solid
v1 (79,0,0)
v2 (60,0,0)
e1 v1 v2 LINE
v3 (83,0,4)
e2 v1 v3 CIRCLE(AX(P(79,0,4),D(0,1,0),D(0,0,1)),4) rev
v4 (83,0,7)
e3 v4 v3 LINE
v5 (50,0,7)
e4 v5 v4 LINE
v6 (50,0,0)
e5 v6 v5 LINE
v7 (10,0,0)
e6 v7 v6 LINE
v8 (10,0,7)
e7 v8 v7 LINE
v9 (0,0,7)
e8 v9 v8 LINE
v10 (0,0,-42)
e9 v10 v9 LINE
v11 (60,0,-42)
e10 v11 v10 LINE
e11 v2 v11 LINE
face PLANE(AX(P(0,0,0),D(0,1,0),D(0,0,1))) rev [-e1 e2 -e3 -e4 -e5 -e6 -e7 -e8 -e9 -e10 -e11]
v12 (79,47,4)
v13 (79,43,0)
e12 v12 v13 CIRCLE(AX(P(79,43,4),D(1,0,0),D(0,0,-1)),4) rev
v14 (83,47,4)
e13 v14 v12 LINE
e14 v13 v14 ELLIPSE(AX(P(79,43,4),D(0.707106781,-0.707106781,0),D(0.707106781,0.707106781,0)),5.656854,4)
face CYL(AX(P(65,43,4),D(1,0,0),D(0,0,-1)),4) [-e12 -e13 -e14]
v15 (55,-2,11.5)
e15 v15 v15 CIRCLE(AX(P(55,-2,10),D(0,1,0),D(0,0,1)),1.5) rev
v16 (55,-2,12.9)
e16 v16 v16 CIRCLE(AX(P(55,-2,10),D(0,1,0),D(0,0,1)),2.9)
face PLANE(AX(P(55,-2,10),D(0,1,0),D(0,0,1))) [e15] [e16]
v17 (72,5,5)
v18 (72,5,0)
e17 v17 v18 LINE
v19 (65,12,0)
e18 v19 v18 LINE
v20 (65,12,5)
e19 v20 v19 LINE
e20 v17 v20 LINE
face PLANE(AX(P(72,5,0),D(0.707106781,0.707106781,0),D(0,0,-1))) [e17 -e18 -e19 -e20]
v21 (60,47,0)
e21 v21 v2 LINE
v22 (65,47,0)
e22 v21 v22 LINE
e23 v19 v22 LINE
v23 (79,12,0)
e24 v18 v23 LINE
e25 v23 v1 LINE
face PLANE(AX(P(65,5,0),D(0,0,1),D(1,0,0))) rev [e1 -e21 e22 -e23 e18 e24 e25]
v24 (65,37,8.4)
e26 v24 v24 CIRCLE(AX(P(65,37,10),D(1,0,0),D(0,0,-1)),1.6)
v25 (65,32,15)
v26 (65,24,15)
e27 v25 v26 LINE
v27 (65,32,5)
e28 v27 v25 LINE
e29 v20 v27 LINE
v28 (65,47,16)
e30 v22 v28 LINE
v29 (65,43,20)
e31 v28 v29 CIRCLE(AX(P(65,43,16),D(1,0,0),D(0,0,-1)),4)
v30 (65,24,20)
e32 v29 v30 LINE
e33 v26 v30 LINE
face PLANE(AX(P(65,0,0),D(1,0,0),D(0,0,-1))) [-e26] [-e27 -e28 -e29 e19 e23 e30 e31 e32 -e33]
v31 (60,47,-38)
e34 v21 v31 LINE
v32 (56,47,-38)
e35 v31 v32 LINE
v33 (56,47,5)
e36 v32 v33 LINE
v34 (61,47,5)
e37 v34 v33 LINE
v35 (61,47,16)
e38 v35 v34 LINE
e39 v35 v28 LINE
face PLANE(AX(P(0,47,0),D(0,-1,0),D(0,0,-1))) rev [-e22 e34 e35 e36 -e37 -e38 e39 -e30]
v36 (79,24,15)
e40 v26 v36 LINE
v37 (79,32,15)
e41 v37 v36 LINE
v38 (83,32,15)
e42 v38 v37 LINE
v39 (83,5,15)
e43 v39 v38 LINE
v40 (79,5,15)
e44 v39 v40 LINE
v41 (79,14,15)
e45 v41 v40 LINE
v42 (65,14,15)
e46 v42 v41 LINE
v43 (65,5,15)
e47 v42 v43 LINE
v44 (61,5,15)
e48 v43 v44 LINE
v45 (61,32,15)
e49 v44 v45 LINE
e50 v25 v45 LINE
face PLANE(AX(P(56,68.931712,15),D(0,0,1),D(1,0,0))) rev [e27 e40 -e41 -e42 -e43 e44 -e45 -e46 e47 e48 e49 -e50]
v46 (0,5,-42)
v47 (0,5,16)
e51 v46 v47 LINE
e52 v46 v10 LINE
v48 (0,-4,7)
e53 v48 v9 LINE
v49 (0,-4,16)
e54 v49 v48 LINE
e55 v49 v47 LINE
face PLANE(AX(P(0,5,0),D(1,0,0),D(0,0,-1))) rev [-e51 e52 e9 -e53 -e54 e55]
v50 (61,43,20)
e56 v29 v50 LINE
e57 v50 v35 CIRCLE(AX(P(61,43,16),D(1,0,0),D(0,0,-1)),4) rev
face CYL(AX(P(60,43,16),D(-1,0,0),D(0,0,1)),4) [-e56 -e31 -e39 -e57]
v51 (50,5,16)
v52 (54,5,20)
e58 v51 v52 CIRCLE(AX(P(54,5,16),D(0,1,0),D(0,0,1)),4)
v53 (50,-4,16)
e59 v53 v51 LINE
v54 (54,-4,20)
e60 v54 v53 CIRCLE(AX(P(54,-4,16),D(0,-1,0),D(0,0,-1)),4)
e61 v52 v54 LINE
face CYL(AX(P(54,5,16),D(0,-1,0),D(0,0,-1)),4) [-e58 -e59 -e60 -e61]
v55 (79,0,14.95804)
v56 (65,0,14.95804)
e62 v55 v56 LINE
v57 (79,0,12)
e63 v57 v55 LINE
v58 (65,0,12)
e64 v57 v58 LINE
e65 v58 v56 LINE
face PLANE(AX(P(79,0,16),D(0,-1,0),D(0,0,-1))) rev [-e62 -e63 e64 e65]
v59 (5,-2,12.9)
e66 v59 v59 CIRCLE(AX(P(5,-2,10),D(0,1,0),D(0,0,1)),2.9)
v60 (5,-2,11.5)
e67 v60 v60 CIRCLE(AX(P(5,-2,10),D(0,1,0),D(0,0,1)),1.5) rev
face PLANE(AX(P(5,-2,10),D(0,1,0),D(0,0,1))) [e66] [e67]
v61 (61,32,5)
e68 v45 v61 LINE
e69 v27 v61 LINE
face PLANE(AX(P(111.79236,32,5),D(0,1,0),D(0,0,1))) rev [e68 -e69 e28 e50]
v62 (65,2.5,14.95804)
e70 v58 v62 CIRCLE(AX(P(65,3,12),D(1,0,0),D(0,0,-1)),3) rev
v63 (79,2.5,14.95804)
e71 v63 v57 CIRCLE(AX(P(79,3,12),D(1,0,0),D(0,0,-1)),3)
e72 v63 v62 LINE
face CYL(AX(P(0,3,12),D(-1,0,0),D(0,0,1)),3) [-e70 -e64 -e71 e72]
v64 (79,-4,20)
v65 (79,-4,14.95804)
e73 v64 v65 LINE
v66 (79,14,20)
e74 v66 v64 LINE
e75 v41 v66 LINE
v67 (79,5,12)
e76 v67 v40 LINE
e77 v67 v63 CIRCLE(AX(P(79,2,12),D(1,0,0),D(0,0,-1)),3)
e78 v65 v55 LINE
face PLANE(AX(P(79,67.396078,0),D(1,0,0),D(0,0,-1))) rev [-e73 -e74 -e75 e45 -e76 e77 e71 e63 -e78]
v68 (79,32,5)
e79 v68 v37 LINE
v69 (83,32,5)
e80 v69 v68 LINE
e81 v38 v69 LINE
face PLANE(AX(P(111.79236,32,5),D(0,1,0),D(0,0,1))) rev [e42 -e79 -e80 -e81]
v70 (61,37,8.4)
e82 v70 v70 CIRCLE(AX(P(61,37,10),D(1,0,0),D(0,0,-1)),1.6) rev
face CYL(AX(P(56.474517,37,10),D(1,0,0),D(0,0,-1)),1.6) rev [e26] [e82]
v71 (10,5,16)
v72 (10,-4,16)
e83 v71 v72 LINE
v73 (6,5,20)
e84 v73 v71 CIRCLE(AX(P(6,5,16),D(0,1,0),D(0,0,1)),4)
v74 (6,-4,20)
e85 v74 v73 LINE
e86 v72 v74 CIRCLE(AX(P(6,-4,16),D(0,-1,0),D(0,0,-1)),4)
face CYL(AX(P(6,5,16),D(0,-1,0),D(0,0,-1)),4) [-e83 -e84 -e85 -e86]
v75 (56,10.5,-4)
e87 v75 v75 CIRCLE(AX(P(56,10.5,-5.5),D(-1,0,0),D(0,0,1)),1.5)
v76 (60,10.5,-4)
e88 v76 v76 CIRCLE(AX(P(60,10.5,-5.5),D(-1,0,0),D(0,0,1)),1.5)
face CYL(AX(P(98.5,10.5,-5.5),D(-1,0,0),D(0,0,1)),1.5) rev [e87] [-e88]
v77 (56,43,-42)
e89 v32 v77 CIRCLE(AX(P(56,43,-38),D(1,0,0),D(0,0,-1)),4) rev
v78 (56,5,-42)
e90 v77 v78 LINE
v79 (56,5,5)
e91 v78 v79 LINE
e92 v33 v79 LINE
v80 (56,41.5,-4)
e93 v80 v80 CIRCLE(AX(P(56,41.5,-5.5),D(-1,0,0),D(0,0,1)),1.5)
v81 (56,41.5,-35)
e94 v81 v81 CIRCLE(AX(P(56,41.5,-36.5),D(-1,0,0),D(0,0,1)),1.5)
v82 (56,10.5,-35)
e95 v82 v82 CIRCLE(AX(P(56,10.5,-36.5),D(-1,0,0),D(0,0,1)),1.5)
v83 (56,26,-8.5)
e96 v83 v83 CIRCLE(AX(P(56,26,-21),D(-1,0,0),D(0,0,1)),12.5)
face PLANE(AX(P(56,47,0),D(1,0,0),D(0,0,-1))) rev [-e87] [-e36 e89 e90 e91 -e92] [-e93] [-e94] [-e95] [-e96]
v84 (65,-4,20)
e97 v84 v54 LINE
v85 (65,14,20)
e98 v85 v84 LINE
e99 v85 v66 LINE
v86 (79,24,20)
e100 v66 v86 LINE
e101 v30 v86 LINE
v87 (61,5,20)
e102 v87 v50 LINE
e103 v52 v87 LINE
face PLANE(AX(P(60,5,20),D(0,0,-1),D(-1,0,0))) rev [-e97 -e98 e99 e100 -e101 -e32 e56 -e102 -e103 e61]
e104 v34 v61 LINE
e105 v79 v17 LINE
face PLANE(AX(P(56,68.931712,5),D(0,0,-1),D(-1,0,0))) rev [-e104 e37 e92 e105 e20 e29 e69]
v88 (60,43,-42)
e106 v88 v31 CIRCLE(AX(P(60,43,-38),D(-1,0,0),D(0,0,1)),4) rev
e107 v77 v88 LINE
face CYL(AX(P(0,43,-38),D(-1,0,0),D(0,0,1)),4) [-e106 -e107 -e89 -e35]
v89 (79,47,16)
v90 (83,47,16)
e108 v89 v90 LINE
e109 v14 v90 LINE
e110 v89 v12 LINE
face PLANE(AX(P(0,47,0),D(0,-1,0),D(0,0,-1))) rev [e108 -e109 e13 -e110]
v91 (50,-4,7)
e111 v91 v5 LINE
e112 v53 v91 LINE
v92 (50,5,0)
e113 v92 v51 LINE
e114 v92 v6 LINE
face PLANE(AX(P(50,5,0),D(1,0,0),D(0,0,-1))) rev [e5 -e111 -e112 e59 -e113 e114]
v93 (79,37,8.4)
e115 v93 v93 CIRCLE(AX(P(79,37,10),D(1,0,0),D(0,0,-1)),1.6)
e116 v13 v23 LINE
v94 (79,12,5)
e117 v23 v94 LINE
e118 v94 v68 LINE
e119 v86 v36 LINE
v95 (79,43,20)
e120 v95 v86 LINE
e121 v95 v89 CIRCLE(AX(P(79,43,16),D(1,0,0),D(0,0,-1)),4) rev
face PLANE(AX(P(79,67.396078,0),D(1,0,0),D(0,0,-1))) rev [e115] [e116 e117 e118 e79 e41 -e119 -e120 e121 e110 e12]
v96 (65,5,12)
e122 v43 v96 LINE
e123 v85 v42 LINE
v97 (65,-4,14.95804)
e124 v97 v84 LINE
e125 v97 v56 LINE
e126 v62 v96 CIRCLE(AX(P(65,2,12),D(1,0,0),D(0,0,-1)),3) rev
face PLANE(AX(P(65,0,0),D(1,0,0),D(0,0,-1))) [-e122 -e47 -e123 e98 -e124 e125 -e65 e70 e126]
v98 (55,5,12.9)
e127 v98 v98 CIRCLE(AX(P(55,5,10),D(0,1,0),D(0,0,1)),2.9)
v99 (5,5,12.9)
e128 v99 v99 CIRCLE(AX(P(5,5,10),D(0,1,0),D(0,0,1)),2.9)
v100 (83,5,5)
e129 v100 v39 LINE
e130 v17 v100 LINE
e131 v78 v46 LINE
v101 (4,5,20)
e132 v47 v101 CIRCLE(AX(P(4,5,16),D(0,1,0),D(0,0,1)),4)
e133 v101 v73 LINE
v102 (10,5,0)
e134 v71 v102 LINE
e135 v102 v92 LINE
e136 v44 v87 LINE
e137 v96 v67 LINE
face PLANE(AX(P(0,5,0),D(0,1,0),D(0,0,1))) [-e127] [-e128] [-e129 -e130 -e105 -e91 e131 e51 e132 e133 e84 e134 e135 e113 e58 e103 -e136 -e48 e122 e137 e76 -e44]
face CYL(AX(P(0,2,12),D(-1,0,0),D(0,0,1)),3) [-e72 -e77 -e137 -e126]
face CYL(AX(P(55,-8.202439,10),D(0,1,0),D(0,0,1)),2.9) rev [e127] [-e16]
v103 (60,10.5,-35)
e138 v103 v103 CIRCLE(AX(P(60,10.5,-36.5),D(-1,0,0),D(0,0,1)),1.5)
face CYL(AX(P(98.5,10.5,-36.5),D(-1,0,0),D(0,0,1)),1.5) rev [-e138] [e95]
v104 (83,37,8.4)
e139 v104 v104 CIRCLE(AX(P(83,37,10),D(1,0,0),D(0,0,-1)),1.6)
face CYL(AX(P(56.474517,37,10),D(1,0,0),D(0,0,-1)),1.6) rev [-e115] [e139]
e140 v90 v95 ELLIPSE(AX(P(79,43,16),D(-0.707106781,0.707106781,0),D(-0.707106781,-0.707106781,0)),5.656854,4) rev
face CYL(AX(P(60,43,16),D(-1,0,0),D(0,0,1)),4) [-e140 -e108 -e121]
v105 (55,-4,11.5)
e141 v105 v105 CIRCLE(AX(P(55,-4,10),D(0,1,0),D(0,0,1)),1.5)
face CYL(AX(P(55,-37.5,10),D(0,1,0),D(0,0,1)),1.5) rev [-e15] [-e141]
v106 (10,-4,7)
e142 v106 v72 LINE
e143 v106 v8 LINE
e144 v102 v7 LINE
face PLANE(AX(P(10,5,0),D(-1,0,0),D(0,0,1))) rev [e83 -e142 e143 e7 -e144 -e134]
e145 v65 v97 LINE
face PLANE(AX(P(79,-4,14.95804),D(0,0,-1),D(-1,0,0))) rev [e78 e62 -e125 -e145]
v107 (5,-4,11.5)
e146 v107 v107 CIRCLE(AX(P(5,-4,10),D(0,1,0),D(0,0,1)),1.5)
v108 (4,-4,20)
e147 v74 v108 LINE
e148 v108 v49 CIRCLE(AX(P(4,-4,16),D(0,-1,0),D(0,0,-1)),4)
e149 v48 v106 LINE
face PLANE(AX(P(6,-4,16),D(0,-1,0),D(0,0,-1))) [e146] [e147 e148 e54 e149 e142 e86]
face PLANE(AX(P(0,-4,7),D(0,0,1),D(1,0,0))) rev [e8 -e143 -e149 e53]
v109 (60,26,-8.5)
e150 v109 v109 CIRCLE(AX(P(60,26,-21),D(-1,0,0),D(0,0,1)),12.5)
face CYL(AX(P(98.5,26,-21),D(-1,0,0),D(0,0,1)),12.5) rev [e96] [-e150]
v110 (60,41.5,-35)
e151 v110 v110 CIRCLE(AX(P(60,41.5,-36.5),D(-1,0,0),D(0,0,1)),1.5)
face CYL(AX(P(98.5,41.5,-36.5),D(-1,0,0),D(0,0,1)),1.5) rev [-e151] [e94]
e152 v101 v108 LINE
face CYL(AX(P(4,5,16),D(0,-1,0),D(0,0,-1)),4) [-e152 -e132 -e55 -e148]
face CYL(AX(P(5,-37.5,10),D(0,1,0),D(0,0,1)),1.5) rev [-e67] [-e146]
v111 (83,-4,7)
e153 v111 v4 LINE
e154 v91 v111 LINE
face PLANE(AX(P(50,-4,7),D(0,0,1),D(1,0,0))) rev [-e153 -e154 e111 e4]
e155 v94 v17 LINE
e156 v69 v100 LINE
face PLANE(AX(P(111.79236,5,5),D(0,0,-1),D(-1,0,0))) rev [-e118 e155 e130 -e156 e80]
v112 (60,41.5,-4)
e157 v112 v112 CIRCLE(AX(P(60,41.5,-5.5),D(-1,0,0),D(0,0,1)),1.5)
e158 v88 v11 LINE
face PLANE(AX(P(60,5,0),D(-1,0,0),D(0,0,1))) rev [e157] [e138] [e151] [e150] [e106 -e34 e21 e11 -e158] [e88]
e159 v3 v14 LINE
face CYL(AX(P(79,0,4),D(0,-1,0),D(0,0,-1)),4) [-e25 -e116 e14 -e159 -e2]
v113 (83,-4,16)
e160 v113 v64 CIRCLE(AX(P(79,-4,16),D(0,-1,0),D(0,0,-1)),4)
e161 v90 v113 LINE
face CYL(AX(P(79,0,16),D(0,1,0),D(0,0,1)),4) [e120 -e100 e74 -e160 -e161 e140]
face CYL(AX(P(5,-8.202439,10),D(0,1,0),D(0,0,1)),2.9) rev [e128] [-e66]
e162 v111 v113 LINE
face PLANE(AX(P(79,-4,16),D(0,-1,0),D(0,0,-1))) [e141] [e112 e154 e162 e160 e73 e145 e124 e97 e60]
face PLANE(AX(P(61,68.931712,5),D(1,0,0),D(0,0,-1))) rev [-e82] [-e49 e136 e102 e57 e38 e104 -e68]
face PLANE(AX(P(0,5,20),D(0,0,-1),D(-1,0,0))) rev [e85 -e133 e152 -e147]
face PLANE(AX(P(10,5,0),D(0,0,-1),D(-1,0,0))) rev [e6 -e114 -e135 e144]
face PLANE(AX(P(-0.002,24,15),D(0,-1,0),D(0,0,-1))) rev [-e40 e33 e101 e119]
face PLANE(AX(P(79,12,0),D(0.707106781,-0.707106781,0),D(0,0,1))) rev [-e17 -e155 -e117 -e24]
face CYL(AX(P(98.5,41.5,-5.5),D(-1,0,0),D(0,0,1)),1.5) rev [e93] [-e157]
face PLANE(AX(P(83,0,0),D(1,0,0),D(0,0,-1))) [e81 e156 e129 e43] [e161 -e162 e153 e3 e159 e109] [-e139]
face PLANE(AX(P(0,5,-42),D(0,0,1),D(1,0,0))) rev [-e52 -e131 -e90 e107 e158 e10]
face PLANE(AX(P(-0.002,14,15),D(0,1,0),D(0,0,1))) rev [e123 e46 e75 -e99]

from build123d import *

# Parameters (mm, degrees)
EXTRUDE_1_DEPTH      = 5
SKETCH_3_W           = 4
SKETCH_3_H           = 42
EXTRUDE_2_DEPTH      = 42
SKETCH_4_R           = 1.5
CUT_EXTRUDE_1_DEPTH  = 42.5
SKETCH_5_R           = 12.5
CUT_EXTRUDE_2_DEPTH  = 42.5
SKETCH_6_R           = 1.5
CUT_EXTRUDE_3_DEPTH  = 42.5
SKETCH_7_W           = 20
SKETCH_7_H           = 5
EXTRUDE_3_DEPTH      = 5
EXTRUDE_5_DEPTH      = 42
SKETCH_11_W          = 20
SKETCH_11_H          = 5
EXTRUDE_6_DEPTH      = 18
SKETCH_12_W          = 4
SKETCH_12_H          = 20
EXTRUDE_7_DEPTH      = 42
CUT_EXTRUDE_4_REACH  = 106.221
SKETCH_13_R          = 1.6
CUT_EXTRUDE_START    = -22
SKETCH_15_W          = 10
SKETCH_15_H          = 27
CUT_EXTRUDE_5_DEPTH  = 22
SKETCH_16_W          = 5
SKETCH_16_H          = 5
CUT_EXTRUDE_6_DEPTH  = 42
EXTRUDE_START        = -22
SKETCH_17_W          = 10
SKETCH_17_H          = 5
EXTRUDE_8_DEPTH      = 22
CUT_EXTRUDE_7_DEPTH  = 5
FILLET_1_R           = 4
SKETCH_20_W          = 14
SKETCH_20_H          = 5
CUT_EXTRUDE_8_DEPTH  = 5
FILLET_3_R           = 3
SKETCH_21_R          = 2.9
CUT_EXTRUDE_9_DEPTH  = 3
EXTRUDE_9_DEPTH      = 4
SKETCH_24_R          = 1.5
CUT_EXTRUDE_10_DEPTH = 4
SKETCH_26_R          = 2.9
CUT_EXTRUDE_15_DEPTH = 4
CHAMFER_1_SIZE       = 7
EXTRUDE_10_REACH     = 103.064
SKETCH_28_W          = 5
SKETCH_28_H          = 10


# Some blends are built 0.0001 mm under size
with BuildPart() as part:
    # 草图1 → 凸台-拉伸1 (new body)
    with BuildSketch(Plane(origin=(0, 0, 0), x_dir=(1, 0, 0), z_dir=(0, 1, 0))):
        Polygon((10, 0), (50, 0), (50, -20), (60, -20), (60, 0), (60, 42), (0, 42), (0, 0), (0, -20), (10, -20), align=None)
    extrude(amount=EXTRUDE_1_DEPTH)

    # 草图3 → 凸台-拉伸2 (add)
    with BuildSketch(Plane(origin=(0, 5, 0), x_dir=(1, 0, 0), z_dir=(0, 1, 0))):
        with Locations((58, 21)):
            Rectangle(SKETCH_3_W, SKETCH_3_H)
    extrude(amount=EXTRUDE_2_DEPTH)

    # 草图4 → 切除-拉伸1 (cut)
    with BuildSketch(Plane.ZY.offset(-56)):
        with Locations((-36.5, 41.5)):
            Circle(SKETCH_4_R)
        with Locations((-5.5, 41.5)):
            Circle(SKETCH_4_R)
        with Locations((-5.5, 10.5)):
            Circle(SKETCH_4_R)
        with Locations((-36.5, 10.5)):
            Circle(SKETCH_4_R)
    extrude(amount=-CUT_EXTRUDE_1_DEPTH, mode=Mode.SUBTRACT)

    # 草图5 → 切除-拉伸2 (cut)
    with BuildSketch(Plane.ZY.offset(-56)):
        with Locations((-21, 26)):
            Circle(SKETCH_5_R)
    extrude(amount=-CUT_EXTRUDE_2_DEPTH, mode=Mode.SUBTRACT)

    # 草图6 → 切除-拉伸3 (cut)
    with BuildSketch(Plane(origin=(0, 5, 0), x_dir=(1, 0, 0), z_dir=(0, 1, 0))):
        with Locations(Location((55, -10, 0), (0, 0, 270))):
            Circle(SKETCH_6_R)
        with Locations(Location((5, -10, 0), (0, 0, 270))):
            Circle(SKETCH_6_R)
    extrude(amount=-CUT_EXTRUDE_3_DEPTH, mode=Mode.SUBTRACT)

    # 草图7 → 凸台-拉伸3 (add)
    with BuildSketch(Plane(origin=(60, 0, 0), x_dir=(0, 0, -1), z_dir=(1, 0, 0))):
        with Locations((-10, 2.5)):
            Rectangle(SKETCH_7_W, SKETCH_7_H)
    extrude(amount=EXTRUDE_3_DEPTH)

    # 草图8 → 凸台-拉伸5 (add)
    with BuildSketch(Plane(origin=(0, 5, 0), x_dir=(1, 0, 0), z_dir=(0, 1, 0))):
        Polygon((65, 0), (56, 0), (56, -5), (61, -5), (61, -15), (56, -15), (56, -20), (65, -20), align=None)
    extrude(amount=EXTRUDE_5_DEPTH)

    # 草图11 → 凸台-拉伸6 (add)
    with BuildSketch(Plane(origin=(65, 0, 0), x_dir=(0, 0, -1), z_dir=(1, 0, 0))):
        with Locations((-10, 2.5)):
            Rectangle(SKETCH_11_W, SKETCH_11_H)
    extrude(amount=EXTRUDE_6_DEPTH)

    # 草图12 → 凸台-拉伸7 (add)
    with BuildSketch(Plane(origin=(0, 5, 0), x_dir=(1, 0, 0), z_dir=(0, 1, 0))):
        with Locations((81, -10)):
            Rectangle(SKETCH_12_W, SKETCH_12_H)
    extrude(amount=EXTRUDE_7_DEPTH)

    # 切除-拉伸4: up to this face of the body (flat: up to its plane)
    cut_extrude_4_end = Plane(part.part.faces().sort_by_distance((61, 26, 10))[0])
    # 草图13 → 切除-拉伸4 (cut, up to the picked face)
    with BuildSketch(Plane(origin=(83, 0, 0), x_dir=(0, 0, -1), z_dir=(1, 0, 0)), mode=Mode.PRIVATE) as cut_extrude_4_sk1:
        with Locations((-10, 37)):
            Circle(SKETCH_13_R)
    cut_extrude_4_tool1 = split(extrude(cut_extrude_4_sk1.sketch, amount=-CUT_EXTRUDE_4_REACH, mode=Mode.PRIVATE), bisect_by=cut_extrude_4_end, keep=Keep.BOTH, mode=Mode.PRIVATE)
    add(cut_extrude_4_tool1.solids().sort_by(Axis((83, 37, 10), (-1, 0, 0)))[0], mode=Mode.SUBTRACT)

    # 草图15 → 切除-拉伸5 (cut)
    with BuildSketch(Plane.ZY.offset(-61).offset(CUT_EXTRUDE_START)):
        with Locations((10, 18.5)):
            Rectangle(SKETCH_15_W, SKETCH_15_H)
    extrude(amount=CUT_EXTRUDE_5_DEPTH, mode=Mode.SUBTRACT)

    # 草图16 → 切除-拉伸6 (cut)
    with BuildSketch(Plane(origin=(0, 47, 0), x_dir=(1, 0, 0), z_dir=(0, 1, 0))):
        with Locations((58.5, -17.5)):
            Rectangle(SKETCH_16_W, SKETCH_16_H)
    extrude(amount=-CUT_EXTRUDE_6_DEPTH, mode=Mode.SUBTRACT)

    # 草图17 → 凸台-拉伸8 (add)
    with BuildSketch(Plane.ZY.offset(-61).offset(EXTRUDE_START)):
        with Locations((10, 7.5)):
            Rectangle(SKETCH_17_W, SKETCH_17_H)
    extrude(amount=EXTRUDE_8_DEPTH)

    # 草图19 → 切除-拉伸7 (cut)
    with BuildSketch(Plane(origin=(0, 10, 0), x_dir=(1, 0, 0), z_dir=(0, 1, 0))):
        Polygon((79, -15), (83, -15), (83, -5), (79, -5), (65, -5), (61, -5), (61, -15), (65, -15), align=None)
    extrude(amount=-CUT_EXTRUDE_7_DEPTH, mode=Mode.SUBTRACT)

    # 圆角1
    fillet_1_edges = [part.edges().sort_by_distance(p)[0] for p in [
        (83, 23.5, 0),
        (83, 23.5, 20),
        (81, 47, 20),
        (81, 47, 0),
        (50, 2.5, 20),
        (10, 2.5, 20),
        (0, 2.5, 20),
        (58, 47, -42),
        (63, 47, 20),
    ]]
    fillet(fillet_1_edges, radius=FILLET_1_R - 0.0001)  # a hair under: the kernel refuses the full size

    # 草图20 → 切除-拉伸8 (cut)
    with BuildSketch(Plane.XY.offset(20)):
        with Locations((72, 2.5)):
            Rectangle(SKETCH_20_W, SKETCH_20_H)
    extrude(amount=-CUT_EXTRUDE_8_DEPTH, mode=Mode.SUBTRACT)

    # 圆角3
    # the kernel refuses this fillet: 3 mm, written as the material it takes off along each edge
    with BuildSketch(Plane(origin=(79, 0, 15), x_dir=(0, 0, -1), z_dir=(-1, 0, 0)), Plane(origin=(65, 5, 15), x_dir=(0, 0, -1), z_dir=(1, 0, 0))) as fillet_3_piece_1:
        with BuildLine():
            CenterArc((FILLET_3_R, -FILLET_3_R), FILLET_3_R, 90, 90)
            Line((0, -FILLET_3_R), (0, 0))
            Line((0, 0), (FILLET_3_R, 0))
        make_face()
    extrude(amount=14, mode=Mode.SUBTRACT)

    # 草图21 → 切除-拉伸9 (cut)
    with BuildSketch(Plane(origin=(0, 5, 0), x_dir=(1, 0, 0), z_dir=(0, 1, 0))):
        with Locations(Location((5, -10, 0), (0, 0, 270))):
            Circle(SKETCH_21_R)
        with Locations(Location((55, -10, 0), (0, 0, 270))):
            Circle(SKETCH_21_R)
    extrude(amount=-CUT_EXTRUDE_9_DEPTH, mode=Mode.SUBTRACT)

    # 草图23 → 凸台-拉伸9 (add)
    with BuildSketch(Plane.XZ):
        with BuildLine():
            Line((54, 20), (65, 20))
            Line((65, 20), (65, 14.958039892))
            Line((65, 14.958039892), (79, 14.958039892))
            Line((79, 14.958039892), (79, 20))
            ThreePointArc((79, 20), (81.828427125, 18.828427125), (83, 16))
            Line((83, 16), (83, 7))
            Line((83, 7), (50, 7))
            Line((50, 7), (50, 16))
            ThreePointArc((50, 16), (51.171572875, 18.828427125), (54, 20))
        make_face()
        with BuildLine():
            Line((4, 20), (6, 20))
            ThreePointArc((6, 20), (8.828427125, 18.828427125), (10, 16))
            Line((10, 16), (10, 7))
            Line((10, 7), (0, 7))
            Line((0, 7), (0, 16))
            ThreePointArc((0, 16), (1.171572875, 18.828427125), (4, 20))
        make_face()
    extrude(amount=EXTRUDE_9_DEPTH)

    # 草图24 → 切除-拉伸10 (cut)
    with BuildSketch(Plane(origin=(0, 0, 0), x_dir=(1, 0, 0), z_dir=(0, 1, 0))):
        with Locations(Location((55, -10, 0), (0, 0, 270))):
            Circle(SKETCH_24_R)
        with Locations(Location((5, -10, 0), (0, 0, 270))):
            Circle(SKETCH_24_R)
    extrude(amount=-CUT_EXTRUDE_10_DEPTH, mode=Mode.SUBTRACT)

    # 草图26 → 切除-拉伸15 (cut)
    with BuildSketch(Plane(origin=(0, 2, 0), x_dir=(1, 0, 0), z_dir=(0, 1, 0))):
        with Locations(Location((55, -10, 0), (0, 0, 270))):
            Circle(SKETCH_26_R)
        with Locations(Location((5, -10, 0), (0, 0, 270))):
            Circle(SKETCH_26_R)
    extrude(amount=-CUT_EXTRUDE_15_DEPTH, mode=Mode.SUBTRACT)

    # 倒角1
    chamfer_1_edges = [part.edges().sort_by_distance(p)[0] for p in [
        (79, 5, 2.5),
        (65, 5, 2.5),
    ]]
    chamfer(chamfer_1_edges, length=CHAMFER_1_SIZE - 0.0001)  # a hair under: the kernel refuses the full size

    # 草图28 → 凸台-拉伸10 (add, up to next)
    with BuildSketch(Plane.ZY.offset(-79), mode=Mode.PRIVATE) as extrude_10_sk1:
        with Locations((17.5, 19)):
            Rectangle(SKETCH_28_W, SKETCH_28_H)
    extrude_10_tool1 = extrude(extrude_10_sk1.sketch, amount=EXTRUDE_10_REACH, mode=Mode.PRIVATE) - part.part
    add(extrude_10_tool1.solids().sort_by_distance((79, 19, 17.5))[0])


solid = part.part
